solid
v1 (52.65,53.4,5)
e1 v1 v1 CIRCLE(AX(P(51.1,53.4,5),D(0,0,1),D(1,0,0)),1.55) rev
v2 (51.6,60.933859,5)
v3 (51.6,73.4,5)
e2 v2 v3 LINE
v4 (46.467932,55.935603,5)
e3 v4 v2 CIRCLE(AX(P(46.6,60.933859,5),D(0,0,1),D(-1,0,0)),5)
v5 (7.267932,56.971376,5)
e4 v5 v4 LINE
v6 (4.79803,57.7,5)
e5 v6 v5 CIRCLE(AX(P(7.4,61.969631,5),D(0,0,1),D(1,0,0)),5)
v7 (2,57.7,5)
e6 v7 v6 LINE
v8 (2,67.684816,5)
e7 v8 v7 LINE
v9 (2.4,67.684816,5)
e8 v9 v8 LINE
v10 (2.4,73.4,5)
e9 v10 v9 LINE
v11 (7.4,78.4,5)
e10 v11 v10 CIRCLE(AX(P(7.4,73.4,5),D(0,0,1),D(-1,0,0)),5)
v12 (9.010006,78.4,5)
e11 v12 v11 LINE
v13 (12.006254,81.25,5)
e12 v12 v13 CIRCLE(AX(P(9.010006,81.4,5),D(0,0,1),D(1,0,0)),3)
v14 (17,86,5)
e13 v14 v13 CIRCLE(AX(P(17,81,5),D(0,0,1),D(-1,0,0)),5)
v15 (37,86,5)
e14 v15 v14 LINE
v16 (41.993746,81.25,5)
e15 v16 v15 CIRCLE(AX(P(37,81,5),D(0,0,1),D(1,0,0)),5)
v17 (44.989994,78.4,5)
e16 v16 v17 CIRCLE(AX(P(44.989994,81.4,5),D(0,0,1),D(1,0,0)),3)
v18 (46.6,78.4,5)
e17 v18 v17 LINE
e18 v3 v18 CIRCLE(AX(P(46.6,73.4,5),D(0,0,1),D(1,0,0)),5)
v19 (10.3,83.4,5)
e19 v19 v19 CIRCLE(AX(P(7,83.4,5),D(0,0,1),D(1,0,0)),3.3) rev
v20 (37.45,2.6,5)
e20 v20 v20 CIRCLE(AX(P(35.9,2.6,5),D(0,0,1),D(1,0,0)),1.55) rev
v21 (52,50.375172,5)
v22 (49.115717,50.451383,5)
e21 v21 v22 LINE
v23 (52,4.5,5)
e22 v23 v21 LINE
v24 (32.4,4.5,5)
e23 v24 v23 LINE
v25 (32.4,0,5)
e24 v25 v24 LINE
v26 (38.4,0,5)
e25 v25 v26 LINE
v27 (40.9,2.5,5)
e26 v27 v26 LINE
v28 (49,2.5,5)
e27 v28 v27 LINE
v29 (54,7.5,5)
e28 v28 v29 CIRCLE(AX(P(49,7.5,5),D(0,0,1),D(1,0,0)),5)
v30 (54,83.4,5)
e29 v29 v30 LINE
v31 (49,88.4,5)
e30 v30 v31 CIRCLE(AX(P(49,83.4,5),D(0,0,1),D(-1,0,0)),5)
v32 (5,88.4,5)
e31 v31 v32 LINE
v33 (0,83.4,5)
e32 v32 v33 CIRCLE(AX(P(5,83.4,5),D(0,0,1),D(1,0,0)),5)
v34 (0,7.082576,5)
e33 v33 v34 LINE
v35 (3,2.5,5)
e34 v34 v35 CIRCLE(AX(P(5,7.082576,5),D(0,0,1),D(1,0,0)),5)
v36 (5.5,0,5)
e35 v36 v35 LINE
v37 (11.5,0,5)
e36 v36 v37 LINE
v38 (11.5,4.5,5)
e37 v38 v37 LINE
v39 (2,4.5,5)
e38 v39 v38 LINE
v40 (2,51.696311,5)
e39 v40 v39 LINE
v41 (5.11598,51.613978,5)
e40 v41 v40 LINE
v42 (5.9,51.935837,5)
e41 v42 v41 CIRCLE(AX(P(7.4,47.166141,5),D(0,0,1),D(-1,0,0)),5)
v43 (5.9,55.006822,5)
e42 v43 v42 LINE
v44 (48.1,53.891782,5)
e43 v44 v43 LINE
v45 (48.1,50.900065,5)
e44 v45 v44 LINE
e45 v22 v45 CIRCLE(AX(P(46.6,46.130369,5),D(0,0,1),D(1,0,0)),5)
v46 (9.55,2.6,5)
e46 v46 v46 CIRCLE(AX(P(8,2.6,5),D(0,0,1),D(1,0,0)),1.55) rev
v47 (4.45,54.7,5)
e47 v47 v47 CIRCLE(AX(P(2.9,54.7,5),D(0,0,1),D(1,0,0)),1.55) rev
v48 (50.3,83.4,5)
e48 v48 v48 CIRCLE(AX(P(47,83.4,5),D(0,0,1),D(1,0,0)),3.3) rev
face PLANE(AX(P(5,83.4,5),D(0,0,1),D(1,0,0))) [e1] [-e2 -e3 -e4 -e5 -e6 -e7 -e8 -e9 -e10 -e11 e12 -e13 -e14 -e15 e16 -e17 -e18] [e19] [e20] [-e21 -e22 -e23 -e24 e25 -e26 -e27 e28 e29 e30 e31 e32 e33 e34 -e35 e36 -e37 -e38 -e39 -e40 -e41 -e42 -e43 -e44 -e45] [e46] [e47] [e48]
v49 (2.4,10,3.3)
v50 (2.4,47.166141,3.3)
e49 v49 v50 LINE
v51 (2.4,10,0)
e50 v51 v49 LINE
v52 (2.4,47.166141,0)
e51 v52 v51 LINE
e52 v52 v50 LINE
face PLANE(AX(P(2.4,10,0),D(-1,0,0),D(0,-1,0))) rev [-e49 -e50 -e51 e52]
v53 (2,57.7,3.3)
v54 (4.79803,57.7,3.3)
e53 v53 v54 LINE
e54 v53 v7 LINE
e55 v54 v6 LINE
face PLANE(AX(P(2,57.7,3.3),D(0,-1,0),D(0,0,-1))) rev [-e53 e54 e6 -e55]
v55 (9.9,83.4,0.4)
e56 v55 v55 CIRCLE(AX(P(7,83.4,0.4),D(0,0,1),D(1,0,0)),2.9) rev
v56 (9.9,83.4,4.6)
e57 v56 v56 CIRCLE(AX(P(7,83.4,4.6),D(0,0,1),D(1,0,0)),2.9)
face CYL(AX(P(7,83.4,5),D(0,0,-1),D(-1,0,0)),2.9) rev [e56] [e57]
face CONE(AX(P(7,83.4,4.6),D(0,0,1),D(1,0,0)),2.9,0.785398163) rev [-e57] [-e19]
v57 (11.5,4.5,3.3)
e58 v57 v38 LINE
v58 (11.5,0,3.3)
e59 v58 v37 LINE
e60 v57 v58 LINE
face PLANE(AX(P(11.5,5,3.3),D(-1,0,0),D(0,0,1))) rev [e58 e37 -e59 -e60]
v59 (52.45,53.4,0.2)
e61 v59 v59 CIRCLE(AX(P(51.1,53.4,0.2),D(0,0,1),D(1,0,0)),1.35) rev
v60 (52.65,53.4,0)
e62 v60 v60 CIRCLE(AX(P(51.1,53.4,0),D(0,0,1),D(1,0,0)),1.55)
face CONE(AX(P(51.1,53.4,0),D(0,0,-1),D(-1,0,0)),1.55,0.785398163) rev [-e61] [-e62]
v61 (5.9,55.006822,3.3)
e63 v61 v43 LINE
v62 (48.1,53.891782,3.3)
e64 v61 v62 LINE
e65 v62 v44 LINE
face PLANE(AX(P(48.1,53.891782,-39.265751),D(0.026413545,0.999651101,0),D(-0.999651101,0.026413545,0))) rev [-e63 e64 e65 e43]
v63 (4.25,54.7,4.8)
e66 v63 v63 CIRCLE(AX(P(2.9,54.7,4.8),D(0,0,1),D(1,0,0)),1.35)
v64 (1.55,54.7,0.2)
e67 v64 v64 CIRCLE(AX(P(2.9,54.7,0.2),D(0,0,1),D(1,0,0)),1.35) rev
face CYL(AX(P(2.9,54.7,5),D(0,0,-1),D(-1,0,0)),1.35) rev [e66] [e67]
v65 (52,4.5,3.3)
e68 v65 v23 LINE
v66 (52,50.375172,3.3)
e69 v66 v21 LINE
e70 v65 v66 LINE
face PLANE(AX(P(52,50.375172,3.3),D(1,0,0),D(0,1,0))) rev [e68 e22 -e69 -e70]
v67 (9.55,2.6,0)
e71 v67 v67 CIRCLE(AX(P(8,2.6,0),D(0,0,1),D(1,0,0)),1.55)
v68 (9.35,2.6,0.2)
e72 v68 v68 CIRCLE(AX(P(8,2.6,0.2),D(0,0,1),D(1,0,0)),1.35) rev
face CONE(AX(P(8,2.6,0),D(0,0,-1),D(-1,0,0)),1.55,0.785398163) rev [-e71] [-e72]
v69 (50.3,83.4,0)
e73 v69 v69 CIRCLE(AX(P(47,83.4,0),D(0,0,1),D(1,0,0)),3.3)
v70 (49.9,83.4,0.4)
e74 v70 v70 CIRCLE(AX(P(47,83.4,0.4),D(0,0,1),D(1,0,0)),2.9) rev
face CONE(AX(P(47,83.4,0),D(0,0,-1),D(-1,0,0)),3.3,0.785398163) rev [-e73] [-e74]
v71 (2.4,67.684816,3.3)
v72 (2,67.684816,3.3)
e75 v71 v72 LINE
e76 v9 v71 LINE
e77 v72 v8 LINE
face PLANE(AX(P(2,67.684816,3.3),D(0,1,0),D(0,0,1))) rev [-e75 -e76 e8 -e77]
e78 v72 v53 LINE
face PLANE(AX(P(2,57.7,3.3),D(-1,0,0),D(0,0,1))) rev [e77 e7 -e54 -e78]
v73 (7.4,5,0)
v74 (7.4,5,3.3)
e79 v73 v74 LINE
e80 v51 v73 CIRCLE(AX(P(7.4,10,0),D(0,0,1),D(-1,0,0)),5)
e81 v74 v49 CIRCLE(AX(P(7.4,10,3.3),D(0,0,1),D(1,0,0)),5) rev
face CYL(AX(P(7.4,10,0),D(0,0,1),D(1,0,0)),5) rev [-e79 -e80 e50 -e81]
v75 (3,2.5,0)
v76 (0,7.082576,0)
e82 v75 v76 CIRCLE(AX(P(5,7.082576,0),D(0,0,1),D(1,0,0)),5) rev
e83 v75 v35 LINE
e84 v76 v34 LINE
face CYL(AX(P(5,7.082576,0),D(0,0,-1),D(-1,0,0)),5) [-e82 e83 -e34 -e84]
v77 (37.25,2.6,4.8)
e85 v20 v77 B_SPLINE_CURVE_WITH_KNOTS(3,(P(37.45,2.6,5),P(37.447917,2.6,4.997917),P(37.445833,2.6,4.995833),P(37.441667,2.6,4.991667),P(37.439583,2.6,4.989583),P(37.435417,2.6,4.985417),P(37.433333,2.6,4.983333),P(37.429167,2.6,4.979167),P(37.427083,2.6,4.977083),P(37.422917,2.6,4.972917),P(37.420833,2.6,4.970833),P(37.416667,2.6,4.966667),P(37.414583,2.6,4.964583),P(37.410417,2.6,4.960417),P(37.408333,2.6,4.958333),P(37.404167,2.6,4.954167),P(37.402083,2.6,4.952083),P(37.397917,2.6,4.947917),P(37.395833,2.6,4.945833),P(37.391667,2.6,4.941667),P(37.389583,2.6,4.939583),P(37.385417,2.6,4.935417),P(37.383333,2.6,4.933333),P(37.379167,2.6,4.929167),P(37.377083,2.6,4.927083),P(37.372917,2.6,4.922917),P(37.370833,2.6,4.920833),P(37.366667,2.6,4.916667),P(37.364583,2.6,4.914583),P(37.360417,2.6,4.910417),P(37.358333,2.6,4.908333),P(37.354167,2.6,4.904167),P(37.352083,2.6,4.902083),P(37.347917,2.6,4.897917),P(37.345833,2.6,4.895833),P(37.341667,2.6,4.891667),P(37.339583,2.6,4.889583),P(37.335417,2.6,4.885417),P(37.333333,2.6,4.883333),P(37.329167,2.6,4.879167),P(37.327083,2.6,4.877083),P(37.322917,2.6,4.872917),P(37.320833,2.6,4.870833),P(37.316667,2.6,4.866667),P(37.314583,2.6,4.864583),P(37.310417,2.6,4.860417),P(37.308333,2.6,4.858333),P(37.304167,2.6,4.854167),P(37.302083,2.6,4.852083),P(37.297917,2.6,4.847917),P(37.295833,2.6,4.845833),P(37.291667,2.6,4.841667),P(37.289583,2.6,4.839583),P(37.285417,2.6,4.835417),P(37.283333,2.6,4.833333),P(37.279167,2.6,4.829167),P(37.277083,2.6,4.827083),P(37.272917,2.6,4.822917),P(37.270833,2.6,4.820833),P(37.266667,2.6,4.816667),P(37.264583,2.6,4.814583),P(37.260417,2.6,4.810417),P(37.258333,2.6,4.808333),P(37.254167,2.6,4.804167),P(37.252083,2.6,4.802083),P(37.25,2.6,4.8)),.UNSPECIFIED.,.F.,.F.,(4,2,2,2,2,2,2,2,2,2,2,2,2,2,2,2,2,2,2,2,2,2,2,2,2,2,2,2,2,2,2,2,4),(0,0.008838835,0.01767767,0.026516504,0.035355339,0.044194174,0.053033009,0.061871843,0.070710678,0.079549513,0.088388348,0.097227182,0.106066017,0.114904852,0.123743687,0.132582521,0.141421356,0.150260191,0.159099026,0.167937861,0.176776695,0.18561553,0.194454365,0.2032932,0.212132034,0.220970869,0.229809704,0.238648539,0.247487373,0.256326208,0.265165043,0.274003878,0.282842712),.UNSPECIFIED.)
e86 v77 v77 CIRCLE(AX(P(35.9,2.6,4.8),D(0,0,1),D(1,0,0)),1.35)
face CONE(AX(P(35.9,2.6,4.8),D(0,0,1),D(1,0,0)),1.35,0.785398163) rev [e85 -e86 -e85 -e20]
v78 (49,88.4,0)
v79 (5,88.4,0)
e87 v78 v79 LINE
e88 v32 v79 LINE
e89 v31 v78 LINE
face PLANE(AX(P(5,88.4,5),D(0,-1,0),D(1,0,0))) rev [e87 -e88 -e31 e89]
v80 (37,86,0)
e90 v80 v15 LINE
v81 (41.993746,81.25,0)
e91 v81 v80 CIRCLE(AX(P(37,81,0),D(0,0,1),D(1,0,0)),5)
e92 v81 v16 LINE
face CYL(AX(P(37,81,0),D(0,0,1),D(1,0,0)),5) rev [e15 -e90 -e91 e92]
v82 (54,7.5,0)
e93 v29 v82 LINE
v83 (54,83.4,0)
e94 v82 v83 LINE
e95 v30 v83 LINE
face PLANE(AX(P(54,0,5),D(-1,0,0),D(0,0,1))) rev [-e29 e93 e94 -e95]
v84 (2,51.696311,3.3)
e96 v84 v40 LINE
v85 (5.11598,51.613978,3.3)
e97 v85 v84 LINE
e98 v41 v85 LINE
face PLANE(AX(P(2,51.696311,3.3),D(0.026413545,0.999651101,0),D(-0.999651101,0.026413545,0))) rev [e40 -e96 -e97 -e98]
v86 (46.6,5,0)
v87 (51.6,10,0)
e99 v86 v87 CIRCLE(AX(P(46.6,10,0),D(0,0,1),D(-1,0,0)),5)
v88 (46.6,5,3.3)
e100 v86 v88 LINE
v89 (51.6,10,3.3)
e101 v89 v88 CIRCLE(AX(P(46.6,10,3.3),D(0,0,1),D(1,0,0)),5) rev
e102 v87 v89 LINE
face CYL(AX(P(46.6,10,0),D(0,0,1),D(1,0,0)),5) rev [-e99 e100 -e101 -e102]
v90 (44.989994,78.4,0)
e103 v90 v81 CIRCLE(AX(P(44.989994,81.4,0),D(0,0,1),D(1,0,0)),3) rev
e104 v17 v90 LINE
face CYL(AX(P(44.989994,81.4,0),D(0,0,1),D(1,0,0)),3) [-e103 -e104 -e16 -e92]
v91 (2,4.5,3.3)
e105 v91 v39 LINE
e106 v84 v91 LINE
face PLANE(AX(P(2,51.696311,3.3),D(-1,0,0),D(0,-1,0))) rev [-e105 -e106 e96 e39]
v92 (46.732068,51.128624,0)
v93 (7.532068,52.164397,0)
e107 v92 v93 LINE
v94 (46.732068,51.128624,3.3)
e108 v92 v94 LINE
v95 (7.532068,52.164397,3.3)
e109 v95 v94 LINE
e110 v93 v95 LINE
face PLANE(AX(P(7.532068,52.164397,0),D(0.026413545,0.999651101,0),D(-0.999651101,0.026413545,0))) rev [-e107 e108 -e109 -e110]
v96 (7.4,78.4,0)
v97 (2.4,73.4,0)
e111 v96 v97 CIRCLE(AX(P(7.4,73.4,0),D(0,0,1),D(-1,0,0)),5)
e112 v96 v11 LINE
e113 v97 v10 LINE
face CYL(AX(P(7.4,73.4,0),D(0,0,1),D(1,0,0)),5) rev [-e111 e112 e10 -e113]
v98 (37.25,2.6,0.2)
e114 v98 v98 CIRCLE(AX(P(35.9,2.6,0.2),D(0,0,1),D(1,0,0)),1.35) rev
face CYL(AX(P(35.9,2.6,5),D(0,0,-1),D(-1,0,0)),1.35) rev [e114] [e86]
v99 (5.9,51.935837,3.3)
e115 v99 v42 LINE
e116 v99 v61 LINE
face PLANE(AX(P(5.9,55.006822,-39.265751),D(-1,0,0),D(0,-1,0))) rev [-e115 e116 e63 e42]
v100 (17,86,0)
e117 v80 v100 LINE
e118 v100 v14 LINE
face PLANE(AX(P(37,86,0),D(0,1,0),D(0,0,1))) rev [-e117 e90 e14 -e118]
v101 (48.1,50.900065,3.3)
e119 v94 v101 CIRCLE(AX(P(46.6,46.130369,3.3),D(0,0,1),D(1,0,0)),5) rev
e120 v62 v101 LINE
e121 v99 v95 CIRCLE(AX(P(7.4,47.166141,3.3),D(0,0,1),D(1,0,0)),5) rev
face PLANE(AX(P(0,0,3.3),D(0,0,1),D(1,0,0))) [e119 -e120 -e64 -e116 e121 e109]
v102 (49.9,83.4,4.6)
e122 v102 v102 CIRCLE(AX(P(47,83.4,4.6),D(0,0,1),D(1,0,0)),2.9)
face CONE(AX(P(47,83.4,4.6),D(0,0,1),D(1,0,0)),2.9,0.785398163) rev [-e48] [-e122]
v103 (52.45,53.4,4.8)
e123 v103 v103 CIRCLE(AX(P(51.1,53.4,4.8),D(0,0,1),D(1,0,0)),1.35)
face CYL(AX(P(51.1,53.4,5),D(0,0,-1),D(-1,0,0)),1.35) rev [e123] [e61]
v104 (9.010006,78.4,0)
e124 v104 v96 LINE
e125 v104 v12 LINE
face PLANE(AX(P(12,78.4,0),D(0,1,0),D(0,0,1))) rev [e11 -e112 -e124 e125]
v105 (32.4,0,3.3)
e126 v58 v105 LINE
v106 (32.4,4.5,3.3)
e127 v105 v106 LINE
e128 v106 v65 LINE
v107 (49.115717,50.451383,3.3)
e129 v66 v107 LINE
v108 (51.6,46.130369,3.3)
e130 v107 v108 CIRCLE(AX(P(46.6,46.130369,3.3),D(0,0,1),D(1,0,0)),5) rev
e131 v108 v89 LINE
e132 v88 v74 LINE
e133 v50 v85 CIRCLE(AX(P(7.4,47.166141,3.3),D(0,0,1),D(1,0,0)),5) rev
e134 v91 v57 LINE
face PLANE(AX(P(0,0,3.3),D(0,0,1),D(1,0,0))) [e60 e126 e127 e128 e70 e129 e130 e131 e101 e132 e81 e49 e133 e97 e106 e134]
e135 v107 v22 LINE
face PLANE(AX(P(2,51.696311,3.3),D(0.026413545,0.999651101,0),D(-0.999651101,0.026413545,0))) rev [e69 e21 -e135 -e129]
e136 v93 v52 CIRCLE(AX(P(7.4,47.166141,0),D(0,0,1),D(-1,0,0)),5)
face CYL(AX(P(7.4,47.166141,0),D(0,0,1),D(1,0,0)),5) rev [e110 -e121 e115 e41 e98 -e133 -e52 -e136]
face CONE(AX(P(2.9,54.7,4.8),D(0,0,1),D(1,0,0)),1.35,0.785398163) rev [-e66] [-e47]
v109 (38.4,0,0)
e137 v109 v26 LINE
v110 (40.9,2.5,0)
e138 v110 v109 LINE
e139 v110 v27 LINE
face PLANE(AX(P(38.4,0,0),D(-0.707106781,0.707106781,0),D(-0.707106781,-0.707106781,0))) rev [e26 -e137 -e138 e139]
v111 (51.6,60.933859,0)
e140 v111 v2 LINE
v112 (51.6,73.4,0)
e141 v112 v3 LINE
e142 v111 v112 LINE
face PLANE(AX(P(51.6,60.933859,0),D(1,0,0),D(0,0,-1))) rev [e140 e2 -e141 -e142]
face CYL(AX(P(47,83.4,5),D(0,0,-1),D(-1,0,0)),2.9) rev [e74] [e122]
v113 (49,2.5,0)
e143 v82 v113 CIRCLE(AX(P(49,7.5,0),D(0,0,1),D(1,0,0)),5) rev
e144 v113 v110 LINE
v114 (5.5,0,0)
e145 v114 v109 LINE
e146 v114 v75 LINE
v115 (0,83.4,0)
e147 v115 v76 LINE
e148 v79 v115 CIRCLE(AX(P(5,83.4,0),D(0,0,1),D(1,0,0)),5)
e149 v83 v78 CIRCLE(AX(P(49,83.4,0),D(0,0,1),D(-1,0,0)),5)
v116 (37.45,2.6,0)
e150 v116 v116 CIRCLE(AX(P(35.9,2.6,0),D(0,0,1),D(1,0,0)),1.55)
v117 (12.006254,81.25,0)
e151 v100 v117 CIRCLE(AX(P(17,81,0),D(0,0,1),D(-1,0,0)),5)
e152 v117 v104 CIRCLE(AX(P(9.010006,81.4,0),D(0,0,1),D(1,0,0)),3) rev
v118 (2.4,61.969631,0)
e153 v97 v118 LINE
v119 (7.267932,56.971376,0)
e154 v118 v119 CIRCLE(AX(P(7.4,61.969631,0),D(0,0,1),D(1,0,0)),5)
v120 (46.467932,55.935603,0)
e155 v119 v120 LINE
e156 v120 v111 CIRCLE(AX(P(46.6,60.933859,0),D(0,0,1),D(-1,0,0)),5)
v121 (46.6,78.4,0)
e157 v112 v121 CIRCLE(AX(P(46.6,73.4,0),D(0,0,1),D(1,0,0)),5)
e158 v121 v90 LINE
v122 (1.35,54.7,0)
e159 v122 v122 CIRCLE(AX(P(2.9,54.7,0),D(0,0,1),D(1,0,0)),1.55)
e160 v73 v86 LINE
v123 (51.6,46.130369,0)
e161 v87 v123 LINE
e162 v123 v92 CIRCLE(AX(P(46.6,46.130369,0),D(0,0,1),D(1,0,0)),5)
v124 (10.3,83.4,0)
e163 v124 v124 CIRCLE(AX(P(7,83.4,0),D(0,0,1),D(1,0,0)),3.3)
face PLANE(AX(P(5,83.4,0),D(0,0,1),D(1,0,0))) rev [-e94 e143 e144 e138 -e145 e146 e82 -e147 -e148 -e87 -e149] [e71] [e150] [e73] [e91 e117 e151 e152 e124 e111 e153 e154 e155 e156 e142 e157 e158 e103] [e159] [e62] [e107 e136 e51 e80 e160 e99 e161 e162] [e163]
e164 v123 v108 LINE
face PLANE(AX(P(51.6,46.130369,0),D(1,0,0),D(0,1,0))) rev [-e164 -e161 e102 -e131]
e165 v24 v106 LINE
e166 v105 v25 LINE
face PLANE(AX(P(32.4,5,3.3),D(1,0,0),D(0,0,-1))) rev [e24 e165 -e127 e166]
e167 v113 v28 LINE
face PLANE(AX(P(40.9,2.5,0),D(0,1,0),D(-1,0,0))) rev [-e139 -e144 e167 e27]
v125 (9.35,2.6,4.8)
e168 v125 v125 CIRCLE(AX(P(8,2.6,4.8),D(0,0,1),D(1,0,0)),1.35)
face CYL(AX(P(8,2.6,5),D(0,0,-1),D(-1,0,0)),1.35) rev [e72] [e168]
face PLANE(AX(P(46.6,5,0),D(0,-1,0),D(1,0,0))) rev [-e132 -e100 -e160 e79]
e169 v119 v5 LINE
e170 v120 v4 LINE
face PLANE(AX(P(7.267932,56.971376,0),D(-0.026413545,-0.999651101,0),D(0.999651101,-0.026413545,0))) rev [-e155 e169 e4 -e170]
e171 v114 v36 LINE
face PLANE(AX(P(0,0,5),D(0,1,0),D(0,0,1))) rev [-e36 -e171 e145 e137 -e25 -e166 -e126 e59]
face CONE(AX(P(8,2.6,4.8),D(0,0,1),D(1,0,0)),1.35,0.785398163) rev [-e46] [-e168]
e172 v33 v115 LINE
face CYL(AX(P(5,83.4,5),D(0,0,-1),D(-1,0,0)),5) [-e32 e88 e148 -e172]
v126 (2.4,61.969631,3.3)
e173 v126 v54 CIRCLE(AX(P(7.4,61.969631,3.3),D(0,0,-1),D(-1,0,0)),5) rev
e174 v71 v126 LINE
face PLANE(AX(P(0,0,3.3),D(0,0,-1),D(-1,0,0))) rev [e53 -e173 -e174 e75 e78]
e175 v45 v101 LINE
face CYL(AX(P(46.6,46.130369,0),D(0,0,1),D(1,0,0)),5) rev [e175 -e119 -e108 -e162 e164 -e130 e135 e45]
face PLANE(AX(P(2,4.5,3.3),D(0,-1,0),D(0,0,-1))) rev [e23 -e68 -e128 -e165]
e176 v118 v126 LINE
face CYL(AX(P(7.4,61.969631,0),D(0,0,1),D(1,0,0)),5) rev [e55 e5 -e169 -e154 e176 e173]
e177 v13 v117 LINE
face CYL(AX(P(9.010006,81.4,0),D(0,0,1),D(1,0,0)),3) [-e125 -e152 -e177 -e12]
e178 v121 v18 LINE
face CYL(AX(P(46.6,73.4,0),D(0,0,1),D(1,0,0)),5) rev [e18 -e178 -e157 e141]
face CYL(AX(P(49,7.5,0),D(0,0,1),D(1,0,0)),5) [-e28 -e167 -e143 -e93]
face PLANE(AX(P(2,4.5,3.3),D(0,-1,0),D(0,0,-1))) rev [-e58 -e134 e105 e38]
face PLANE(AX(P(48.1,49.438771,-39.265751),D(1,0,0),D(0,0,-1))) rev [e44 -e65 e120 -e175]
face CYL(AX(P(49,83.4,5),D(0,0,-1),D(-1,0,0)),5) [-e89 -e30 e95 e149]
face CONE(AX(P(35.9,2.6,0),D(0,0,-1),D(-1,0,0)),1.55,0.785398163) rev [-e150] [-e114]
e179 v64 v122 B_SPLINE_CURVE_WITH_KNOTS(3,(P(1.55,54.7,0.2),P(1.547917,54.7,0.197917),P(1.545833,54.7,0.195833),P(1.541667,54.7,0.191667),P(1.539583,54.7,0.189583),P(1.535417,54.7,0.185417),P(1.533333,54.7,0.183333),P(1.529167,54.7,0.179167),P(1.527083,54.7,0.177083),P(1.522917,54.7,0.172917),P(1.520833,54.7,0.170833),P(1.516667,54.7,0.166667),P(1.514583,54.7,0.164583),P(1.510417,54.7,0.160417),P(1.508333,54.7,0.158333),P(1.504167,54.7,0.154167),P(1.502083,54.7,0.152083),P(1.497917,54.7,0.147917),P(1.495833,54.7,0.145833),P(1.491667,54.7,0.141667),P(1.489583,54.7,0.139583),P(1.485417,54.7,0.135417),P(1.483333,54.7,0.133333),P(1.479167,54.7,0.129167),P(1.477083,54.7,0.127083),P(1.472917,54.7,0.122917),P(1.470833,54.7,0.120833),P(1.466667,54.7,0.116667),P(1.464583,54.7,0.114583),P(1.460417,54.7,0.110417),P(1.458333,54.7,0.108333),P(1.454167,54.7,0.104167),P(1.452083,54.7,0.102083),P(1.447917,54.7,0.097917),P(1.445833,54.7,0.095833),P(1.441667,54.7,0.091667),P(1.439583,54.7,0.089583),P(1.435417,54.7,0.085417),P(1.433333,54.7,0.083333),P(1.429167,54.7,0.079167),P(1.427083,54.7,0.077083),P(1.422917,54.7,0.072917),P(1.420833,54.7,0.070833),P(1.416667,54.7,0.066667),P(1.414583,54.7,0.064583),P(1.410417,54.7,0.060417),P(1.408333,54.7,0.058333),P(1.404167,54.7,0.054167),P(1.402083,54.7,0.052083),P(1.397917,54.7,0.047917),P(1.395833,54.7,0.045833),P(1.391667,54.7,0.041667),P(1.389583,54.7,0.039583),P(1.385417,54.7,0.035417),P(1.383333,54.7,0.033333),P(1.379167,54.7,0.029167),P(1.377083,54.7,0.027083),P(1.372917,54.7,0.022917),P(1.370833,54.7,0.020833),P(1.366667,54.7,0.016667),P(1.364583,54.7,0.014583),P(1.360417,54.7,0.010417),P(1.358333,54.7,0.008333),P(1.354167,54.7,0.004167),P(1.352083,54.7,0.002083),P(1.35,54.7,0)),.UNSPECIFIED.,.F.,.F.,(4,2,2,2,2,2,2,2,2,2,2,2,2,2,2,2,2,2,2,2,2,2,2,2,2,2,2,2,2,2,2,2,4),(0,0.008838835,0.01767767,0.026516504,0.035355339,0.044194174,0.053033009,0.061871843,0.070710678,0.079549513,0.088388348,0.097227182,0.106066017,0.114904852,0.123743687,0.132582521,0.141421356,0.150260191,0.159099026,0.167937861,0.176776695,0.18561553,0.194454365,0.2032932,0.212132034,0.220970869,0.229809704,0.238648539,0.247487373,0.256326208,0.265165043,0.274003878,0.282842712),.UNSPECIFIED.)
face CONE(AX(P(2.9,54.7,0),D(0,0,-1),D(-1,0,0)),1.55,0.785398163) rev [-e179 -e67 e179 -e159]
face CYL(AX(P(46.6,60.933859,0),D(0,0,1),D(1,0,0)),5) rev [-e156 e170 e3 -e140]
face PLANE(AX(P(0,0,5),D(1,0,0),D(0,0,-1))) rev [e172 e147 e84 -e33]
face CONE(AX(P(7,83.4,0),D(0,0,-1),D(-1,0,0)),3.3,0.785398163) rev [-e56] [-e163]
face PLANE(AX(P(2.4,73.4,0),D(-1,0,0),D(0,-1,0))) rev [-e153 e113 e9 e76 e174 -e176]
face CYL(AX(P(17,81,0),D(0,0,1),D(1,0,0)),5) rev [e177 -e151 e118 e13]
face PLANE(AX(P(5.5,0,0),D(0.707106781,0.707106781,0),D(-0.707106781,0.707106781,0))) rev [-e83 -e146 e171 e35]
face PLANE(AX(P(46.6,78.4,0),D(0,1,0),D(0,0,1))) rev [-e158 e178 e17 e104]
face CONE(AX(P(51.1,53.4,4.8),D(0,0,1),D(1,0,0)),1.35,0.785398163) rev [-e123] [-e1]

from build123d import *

# Parameters (mm, degrees)
SKETCH1_R           = 2.9
SKETCH1_R_2         = 1.35
BOSS_EXTRUDE1_DEPTH = 5
CUT_EXTRUDE1_DEPTH  = 5
CUT_EXTRUDE2_DEPTH  = 5
CHAMFER1_SIZE       = 0.4
CHAMFER2_SIZE       = 0.2
FILLET1_R           = 3
FILLET2_R           = 5
SKETCH4_W           = 20.9
SKETCH4_H           = 5
CUT_EXTRUDE3_DEPTH  = 1.7
SKETCH5_W           = 8
SKETCH5_H           = 9.98481564
CUT_EXTRUDE5_DEPTH  = 1.7
CUT_EXTRUDE6_DEPTH  = 1.7


with BuildPart() as part:
    # Sketch1 → Boss-Extrude1 (new body)
    with BuildSketch(Plane.XY):
        with BuildLine():
            Line((0, 0), (54, 0))
            Line((54, 0), (54, 83.4))
            ThreePointArc((54, 83.4), (52.535533906, 86.935533906), (49, 88.4))
            Line((49, 88.4), (5, 88.4))
            ThreePointArc((5, 88.4), (1.464466094, 86.935533906), (0, 83.4))
            Line((0, 83.4), (0, 0))
        make_face()
        with Locations((7, 83.4)):
            Circle(SKETCH1_R, mode=Mode.SUBTRACT)
        with Locations((47, 83.4)):
            Circle(SKETCH1_R, mode=Mode.SUBTRACT)
        with Locations((2.9, 54.7)):
            Circle(SKETCH1_R_2, mode=Mode.SUBTRACT)
        with Locations((51.1, 53.4)):
            Circle(SKETCH1_R_2, mode=Mode.SUBTRACT)
        with Locations((8, 2.6)):
            Circle(SKETCH1_R_2, mode=Mode.SUBTRACT)
        with Locations((35.9, 2.6)):
            Circle(SKETCH1_R_2, mode=Mode.SUBTRACT)
    extrude(amount=BOSS_EXTRUDE1_DEPTH)

    # Sketch2 → Cut-Extrude1 (cut)
    with BuildSketch(Plane.XY.offset(5)):
        Polygon((5.5, 0), (3, 2.5), (0, 2.5), (0, 0), align=None)
        Polygon((38.4, 0), (40.9, 2.5), (54, 2.5), (54, 0), align=None)
    extrude(amount=-CUT_EXTRUDE1_DEPTH, mode=Mode.SUBTRACT)

    # Sketch3 → Cut-Extrude2 (cut)
    with BuildSketch(Plane.XY.offset(5)):
        with BuildLine():
            Line((12, 81), (12, 78.4))
            Line((12, 78.4), (7.4, 78.4))
            ThreePointArc((7.4, 78.4), (3.864466094, 76.935533906), (2.4, 73.4))
            Line((2.4, 73.4), (2.4, 61.96963128))
            ThreePointArc((2.4, 61.96963128), (3.818077427, 58.48110284), (7.267932273, 56.971375773))
            Line((7.267932273, 56.971375773), (46.467932273, 55.935603416))
            ThreePointArc((46.467932273, 55.935603416), (50.088528441, 57.35193635), (51.6, 60.933858923))
            Line((51.6, 60.933858923), (51.6, 73.4))
            ThreePointArc((51.6, 73.4), (50.135533906, 76.935533906), (46.6, 78.4))
            Line((46.6, 78.4), (42, 78.4))
            Line((42, 78.4), (42, 81))
            ThreePointArc((42, 81), (40.535533906, 84.535533906), (37, 86))
            Line((37, 86), (17, 86))
            ThreePointArc((17, 86), (13.464466094, 84.535533906), (12, 81))
        make_face()
        with BuildLine():
            Line((7.532067727, 52.164396584), (46.732067727, 51.128624227))
            ThreePointArc((46.732067727, 51.128624227), (50.181922573, 49.61889716), (51.6, 46.13036872))
            Line((51.6, 46.13036872), (51.6, 10))
            ThreePointArc((51.6, 10), (50.135533906, 6.464466094), (46.6, 5))
            Line((46.6, 5), (7.4, 5))
            ThreePointArc((7.4, 5), (3.864466094, 6.464466094), (2.4, 10))
            Line((2.4, 10), (2.4, 47.166141077))
            ThreePointArc((2.4, 47.166141077), (3.911471559, 50.74806365), (7.532067727, 52.164396584))
        make_face()
    extrude(amount=-CUT_EXTRUDE2_DEPTH, mode=Mode.SUBTRACT)

    # Chamfer1
    chamfer1_edges = [part.edges().sort_by_distance(p)[0] for p in [
        (4.1, 83.4, 0),
        (4.1, 83.4, 5),
        (44.1, 83.4, 0),
        (44.1, 83.4, 5),
    ]]
    chamfer(chamfer1_edges, length=CHAMFER1_SIZE)

    # Chamfer2
    chamfer2_edges = [part.edges().sort_by_distance(p)[0] for p in [
        (1.55, 54.7, 0),
        (1.55, 54.7, 5),
        (49.75, 53.4, 0),
        (49.75, 53.4, 5),
        (6.65, 2.6, 0),
        (6.65, 2.6, 5),
        (34.55, 2.6, 0),
        (34.55, 2.6, 5),
    ]]
    chamfer(chamfer2_edges, length=CHAMFER2_SIZE)

    # Fillet1
    fillet1_edges = [part.edges().sort_by_distance(p)[0] for p in [
        (42, 78.4, 2.5),
        (12, 78.4, 2.5),
    ]]
    fillet(fillet1_edges, radius=FILLET1_R)

    # Fillet2
    # the kernel refuses this fillet: 5 mm, written as the material it takes off along each edge
    with BuildSketch(Plane(origin=(0, 2.5, 16.456439237), x_dir=(0, 1, 0), z_dir=(0, 0, -1))) as fillet2_piece_1:
        with BuildLine():
            CenterArc((4.582575695, 5), FILLET2_R, 203.578178478, 66.421821522)
            Line((0, 3), (-0.091651514, 2.96))
            ThreePointArc((-0.091651514, 2.96), (-0.1, 1.5), (-0.1, 0))
            Line((-0.1, 0), (0, -0.1))
            Line((0, -0.1), (4.582575695, -0.1))
            Line((4.582575695, -0.1), (4.582575695, 0))
        make_face()
    extrude(amount=27.912878475, mode=Mode.SUBTRACT)
    with BuildSketch(Plane(origin=(54, 2.5, 17.5), x_dir=(0, 1, 0), z_dir=(0, 0, -1))) as fillet2_piece_2:
        with BuildLine():
            CenterArc((FILLET2_R, -FILLET2_R), FILLET2_R, 90, 90)
            Line((0, -FILLET2_R), (-FILLET2_R * 0.02, -FILLET2_R))
            Line((-FILLET2_R * 0.02, -FILLET2_R), (-FILLET2_R * 0.02, FILLET2_R * 0.02))
            Line((-FILLET2_R * 0.02, FILLET2_R * 0.02), (FILLET2_R, FILLET2_R * 0.02))
            Line((FILLET2_R, FILLET2_R * 0.02), (FILLET2_R, 0))
        make_face()
    extrude(amount=30, mode=Mode.SUBTRACT)

    # Sketch4 → Cut-Extrude3 (cut)
    with BuildSketch(Plane.XY.offset(5)):
        with Locations((21.95, 2.5)):
            Rectangle(SKETCH4_W, SKETCH4_H)
    extrude(amount=-CUT_EXTRUDE3_DEPTH, mode=Mode.SUBTRACT)

    # Sketch5 → Cut-Extrude5 (cut)
    with BuildSketch(Plane.XY.offset(5)):
        Polygon((2, 51.696310663), (52, 50.375172451), (52, 4.5), (2, 4.5), align=None)
        with Locations((6, 62.69240782)):
            Rectangle(SKETCH5_W, SKETCH5_H)
    extrude(amount=-CUT_EXTRUDE5_DEPTH, mode=Mode.SUBTRACT)

    # Sketch6 → Cut-Extrude6 (cut)
    with BuildSketch(Plane.XY.offset(5)):
        Polygon((48.1, 53.891781634), (5.9, 55.006822285), (5.9, 50.553811317), (48.1, 49.438770667), align=None)
    extrude(amount=-CUT_EXTRUDE6_DEPTH, mode=Mode.SUBTRACT)


solid = part.part
